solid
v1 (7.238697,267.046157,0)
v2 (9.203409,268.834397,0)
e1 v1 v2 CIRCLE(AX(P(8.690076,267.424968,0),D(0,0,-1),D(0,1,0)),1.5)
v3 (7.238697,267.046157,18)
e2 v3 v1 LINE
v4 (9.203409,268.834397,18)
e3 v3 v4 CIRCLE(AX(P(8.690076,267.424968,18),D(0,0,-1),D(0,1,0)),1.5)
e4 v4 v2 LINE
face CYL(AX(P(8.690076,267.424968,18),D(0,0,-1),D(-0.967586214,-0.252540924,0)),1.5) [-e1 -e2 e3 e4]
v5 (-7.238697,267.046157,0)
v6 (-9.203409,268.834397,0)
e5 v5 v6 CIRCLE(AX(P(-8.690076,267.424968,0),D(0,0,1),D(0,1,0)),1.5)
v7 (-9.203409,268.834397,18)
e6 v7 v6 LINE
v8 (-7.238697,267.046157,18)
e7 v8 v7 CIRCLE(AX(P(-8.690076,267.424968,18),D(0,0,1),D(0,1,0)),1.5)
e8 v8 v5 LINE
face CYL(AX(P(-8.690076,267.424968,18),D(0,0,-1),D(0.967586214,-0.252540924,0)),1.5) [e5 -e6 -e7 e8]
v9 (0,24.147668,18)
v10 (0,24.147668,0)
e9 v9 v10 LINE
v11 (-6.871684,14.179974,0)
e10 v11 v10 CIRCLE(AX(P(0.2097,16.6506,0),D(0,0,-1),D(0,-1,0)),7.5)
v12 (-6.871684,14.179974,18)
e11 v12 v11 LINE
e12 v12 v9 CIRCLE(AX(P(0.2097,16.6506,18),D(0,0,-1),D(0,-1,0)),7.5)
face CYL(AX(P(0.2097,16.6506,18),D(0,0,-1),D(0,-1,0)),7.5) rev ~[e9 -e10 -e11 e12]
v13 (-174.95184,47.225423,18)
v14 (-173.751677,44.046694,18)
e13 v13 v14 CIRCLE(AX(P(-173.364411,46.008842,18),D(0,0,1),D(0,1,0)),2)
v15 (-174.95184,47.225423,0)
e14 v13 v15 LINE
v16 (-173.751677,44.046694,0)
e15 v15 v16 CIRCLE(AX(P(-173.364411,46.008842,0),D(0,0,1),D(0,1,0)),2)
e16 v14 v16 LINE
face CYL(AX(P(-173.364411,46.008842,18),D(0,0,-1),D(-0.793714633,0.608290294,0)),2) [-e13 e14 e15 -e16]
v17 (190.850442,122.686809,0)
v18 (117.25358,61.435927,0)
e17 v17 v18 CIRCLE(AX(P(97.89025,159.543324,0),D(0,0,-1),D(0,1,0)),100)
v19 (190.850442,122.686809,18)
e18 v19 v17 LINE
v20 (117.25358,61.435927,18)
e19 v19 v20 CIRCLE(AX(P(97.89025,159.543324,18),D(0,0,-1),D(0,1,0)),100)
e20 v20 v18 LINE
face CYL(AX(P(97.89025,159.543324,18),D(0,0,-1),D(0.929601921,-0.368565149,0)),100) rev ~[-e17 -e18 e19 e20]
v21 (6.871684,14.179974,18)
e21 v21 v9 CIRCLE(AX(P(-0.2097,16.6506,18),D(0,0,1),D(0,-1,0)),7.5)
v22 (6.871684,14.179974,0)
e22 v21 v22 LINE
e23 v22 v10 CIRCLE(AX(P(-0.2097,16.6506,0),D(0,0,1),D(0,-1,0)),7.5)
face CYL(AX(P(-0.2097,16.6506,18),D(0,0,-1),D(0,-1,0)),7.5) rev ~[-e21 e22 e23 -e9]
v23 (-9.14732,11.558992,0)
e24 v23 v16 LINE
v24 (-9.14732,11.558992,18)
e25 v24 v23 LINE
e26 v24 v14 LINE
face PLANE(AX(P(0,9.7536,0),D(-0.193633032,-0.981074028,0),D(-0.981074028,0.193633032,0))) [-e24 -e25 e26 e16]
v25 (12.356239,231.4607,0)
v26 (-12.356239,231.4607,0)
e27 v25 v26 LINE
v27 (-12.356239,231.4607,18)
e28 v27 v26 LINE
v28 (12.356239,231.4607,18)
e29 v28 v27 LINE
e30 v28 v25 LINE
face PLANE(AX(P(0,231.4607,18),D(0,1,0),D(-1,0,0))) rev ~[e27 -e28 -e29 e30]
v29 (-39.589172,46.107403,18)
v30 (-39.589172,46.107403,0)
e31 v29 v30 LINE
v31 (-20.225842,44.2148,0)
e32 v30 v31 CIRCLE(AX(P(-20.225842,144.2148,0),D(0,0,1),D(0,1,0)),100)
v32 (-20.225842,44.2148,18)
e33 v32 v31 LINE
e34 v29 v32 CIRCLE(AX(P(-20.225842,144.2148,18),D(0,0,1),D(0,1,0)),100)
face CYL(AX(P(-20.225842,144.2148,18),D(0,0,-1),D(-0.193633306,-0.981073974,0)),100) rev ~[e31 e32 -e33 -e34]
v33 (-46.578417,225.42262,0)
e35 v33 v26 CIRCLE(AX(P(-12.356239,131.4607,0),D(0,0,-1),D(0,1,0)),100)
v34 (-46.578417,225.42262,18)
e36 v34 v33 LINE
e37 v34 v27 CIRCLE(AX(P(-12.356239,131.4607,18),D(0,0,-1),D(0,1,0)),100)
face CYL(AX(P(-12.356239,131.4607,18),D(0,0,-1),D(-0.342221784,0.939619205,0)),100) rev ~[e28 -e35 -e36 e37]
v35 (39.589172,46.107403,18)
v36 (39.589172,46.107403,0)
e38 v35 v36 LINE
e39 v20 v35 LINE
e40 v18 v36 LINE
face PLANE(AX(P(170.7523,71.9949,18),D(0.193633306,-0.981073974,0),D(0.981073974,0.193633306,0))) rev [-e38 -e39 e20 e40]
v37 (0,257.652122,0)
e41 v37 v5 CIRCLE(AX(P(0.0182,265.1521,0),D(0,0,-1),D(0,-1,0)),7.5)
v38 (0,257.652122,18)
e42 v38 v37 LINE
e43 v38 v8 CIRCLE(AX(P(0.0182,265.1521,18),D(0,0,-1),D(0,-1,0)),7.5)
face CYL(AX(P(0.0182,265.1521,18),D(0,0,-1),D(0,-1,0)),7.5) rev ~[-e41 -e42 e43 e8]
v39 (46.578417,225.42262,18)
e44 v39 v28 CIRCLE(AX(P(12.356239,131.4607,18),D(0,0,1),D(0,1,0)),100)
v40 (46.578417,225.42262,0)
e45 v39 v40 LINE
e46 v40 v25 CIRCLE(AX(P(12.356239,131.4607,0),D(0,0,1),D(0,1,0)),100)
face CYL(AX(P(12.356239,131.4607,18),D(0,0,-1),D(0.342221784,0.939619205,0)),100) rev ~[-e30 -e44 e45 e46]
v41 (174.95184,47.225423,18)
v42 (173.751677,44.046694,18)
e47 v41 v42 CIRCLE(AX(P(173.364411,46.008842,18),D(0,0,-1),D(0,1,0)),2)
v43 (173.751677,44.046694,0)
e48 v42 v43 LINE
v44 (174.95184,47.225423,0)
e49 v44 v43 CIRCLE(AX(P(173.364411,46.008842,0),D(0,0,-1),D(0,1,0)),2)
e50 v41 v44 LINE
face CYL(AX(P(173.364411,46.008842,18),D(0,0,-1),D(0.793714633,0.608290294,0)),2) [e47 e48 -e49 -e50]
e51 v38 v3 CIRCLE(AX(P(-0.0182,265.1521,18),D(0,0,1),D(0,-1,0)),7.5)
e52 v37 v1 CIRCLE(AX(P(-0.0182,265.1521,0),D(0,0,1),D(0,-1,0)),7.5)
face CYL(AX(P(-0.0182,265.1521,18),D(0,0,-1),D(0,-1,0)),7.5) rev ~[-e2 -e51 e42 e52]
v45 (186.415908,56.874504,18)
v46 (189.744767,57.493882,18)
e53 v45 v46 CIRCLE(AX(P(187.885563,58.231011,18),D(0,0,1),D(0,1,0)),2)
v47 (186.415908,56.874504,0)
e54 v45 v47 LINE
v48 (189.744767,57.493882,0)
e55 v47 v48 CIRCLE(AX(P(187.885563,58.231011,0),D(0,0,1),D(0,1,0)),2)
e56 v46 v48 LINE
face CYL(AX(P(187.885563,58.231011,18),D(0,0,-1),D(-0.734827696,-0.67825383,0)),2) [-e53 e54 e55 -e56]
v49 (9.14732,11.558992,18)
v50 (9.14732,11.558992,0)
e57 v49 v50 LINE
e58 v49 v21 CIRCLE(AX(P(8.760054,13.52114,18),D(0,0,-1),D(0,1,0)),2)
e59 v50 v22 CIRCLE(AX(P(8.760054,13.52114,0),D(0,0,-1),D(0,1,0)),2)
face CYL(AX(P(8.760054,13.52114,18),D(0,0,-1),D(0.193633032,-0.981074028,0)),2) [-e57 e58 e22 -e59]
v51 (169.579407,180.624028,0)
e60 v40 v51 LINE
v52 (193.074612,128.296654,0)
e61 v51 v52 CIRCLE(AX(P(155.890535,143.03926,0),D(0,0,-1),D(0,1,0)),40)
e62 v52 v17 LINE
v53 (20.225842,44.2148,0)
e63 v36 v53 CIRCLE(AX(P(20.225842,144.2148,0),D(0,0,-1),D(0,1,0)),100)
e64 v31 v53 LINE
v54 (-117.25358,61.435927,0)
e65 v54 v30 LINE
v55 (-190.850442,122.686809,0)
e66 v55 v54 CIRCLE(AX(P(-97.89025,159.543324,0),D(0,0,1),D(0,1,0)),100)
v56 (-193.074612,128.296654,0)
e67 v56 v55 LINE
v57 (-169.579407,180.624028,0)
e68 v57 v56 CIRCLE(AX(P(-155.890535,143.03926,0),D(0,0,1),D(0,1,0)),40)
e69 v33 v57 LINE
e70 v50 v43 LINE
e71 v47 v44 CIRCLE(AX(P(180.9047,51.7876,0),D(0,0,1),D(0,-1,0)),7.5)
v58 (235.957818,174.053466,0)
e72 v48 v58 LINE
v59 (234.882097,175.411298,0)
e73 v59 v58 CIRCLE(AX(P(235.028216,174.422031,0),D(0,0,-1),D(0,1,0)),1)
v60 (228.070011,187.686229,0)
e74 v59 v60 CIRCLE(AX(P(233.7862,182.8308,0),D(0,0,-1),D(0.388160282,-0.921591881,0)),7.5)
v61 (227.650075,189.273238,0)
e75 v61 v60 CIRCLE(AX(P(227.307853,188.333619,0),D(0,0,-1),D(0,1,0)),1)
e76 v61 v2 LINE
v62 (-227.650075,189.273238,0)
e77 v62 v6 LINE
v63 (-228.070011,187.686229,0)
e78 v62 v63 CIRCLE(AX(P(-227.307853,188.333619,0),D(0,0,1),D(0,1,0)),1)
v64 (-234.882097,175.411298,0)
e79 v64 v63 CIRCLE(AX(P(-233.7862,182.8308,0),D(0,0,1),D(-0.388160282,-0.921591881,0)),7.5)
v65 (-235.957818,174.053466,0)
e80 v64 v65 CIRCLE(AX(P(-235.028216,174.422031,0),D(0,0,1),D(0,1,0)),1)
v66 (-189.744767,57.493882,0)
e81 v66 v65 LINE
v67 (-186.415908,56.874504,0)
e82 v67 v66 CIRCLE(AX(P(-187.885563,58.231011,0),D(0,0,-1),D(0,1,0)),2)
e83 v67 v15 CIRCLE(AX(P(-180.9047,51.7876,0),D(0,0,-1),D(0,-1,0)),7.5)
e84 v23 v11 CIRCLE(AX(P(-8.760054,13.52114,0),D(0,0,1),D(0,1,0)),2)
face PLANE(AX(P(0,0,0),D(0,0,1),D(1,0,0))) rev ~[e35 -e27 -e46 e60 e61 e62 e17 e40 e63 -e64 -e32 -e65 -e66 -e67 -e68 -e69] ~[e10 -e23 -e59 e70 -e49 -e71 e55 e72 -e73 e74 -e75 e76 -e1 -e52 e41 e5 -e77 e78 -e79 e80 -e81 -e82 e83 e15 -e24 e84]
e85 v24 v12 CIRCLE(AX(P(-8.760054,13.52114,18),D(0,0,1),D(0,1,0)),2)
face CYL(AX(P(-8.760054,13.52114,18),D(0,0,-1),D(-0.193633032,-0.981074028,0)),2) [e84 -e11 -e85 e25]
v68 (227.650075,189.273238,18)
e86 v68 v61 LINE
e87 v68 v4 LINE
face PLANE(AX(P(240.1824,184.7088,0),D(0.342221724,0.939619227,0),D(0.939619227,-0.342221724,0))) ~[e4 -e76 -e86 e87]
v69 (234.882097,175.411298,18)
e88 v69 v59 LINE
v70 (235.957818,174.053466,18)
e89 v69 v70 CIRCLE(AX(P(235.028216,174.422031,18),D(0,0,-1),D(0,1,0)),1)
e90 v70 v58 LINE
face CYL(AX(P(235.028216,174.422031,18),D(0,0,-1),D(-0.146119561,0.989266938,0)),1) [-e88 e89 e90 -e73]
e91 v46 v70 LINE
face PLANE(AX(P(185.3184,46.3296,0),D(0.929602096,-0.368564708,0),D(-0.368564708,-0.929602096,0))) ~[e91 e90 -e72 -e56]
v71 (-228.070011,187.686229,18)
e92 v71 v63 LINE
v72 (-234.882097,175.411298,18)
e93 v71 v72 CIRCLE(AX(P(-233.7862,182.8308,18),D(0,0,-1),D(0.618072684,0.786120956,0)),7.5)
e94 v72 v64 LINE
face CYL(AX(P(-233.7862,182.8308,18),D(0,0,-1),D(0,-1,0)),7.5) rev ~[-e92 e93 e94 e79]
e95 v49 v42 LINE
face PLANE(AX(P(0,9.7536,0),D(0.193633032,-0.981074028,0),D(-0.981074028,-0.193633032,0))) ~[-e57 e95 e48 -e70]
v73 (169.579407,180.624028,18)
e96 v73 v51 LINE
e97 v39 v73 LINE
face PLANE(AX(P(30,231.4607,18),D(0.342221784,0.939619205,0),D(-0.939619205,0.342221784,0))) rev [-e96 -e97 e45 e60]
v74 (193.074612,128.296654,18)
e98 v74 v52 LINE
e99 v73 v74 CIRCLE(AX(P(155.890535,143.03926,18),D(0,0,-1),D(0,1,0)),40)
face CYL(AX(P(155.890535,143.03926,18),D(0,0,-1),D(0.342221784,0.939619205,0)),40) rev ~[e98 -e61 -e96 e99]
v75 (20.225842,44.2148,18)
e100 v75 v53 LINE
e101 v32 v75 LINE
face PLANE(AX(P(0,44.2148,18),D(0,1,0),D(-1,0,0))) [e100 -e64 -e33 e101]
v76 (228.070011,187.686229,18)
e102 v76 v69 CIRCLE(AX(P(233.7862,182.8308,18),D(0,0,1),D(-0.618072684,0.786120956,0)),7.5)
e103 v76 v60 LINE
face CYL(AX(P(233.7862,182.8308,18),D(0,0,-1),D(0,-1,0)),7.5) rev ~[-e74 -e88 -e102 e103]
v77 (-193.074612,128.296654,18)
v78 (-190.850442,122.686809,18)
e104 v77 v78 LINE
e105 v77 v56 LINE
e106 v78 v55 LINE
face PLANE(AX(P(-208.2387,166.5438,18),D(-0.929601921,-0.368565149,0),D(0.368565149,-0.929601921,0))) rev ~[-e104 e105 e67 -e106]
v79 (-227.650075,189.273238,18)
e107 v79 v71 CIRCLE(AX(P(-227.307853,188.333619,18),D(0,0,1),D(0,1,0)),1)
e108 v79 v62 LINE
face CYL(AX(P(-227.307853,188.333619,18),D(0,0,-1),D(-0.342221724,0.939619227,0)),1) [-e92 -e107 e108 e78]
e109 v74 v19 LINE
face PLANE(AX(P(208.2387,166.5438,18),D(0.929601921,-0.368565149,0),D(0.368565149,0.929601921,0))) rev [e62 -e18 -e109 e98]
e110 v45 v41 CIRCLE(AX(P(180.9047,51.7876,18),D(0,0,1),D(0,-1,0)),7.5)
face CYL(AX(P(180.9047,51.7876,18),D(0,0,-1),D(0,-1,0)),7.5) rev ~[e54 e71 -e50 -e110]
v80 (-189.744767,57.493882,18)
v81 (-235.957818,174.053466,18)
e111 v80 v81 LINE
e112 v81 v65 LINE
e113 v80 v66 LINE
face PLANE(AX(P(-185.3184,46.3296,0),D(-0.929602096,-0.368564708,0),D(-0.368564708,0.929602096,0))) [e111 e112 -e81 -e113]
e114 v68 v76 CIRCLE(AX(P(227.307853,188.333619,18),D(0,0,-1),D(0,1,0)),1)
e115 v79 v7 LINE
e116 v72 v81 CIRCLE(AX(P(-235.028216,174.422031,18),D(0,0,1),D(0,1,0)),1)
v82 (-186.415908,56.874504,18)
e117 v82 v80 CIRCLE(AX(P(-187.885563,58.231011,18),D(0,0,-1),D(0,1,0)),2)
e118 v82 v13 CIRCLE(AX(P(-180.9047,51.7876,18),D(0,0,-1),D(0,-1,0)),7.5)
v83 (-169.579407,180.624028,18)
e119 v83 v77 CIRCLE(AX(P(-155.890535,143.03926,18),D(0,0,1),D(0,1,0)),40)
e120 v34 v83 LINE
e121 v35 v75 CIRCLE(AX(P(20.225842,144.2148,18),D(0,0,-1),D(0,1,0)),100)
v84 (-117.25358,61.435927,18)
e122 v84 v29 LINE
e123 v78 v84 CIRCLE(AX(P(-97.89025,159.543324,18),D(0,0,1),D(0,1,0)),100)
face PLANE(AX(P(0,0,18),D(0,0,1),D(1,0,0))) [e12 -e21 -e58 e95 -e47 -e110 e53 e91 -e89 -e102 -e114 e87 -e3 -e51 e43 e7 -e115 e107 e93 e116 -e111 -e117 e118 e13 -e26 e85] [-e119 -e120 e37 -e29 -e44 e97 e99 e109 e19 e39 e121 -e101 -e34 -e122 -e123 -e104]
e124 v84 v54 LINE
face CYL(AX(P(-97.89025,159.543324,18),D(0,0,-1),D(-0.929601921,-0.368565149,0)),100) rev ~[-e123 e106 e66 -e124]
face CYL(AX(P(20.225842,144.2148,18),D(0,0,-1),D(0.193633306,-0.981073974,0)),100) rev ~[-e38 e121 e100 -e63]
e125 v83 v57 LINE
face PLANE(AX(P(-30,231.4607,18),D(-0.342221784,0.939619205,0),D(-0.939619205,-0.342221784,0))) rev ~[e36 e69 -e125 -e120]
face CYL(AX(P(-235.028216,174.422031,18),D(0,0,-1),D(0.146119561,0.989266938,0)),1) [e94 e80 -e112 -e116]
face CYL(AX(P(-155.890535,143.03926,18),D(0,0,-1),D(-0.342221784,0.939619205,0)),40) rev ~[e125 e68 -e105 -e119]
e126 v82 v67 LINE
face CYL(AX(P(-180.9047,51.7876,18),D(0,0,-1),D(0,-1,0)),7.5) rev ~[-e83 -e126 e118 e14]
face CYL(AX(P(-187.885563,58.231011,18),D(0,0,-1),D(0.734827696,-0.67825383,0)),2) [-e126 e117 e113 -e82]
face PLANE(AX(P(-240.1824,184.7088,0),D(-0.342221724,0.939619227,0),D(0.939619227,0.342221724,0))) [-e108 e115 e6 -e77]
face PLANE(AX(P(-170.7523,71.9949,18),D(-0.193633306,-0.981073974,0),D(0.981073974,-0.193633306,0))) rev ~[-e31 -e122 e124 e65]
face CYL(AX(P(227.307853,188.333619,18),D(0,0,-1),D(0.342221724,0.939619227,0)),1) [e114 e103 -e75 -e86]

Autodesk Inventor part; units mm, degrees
ref_plane "YZ Plane" through (0, 0, 0) normal (1, 0, 0) x (0, 1, 0)
ref_plane "XZ Plane" through (0, 0, 0) normal (0, 1, 0) x (-1, 0, 0)
ref_plane "XY Plane" through (0, 0, 0) normal (0, 0, 1) x (1, 0, 0)
sketch "Sketch1" plane through (0, 0, 0) normal (0, 0, 1) x (1, 0, 0)
  line L0 (0, 9.7536) -> (-185.3184, 46.3296)
  line L1 (-185.3184, 46.3296) -> (-240.1824, 184.7088)
  line L2 (-240.1824, 184.7088) -> (0, 272.1864)
  line L3 (0, 562.8605) -> (0, -145.2705) construction
  line L4 (0, 272.1864) -> (0, 9.7536)
  point P0 (0, 0)
  dimension "d9" = 272.1864
  dimension "d11" = 240.1824
  dimension "d15" = 184.7088
  dimension "d20" = 185.3184
  dimension "d22" = 46.3296
  dimension "d39" = 0
  dimension "d41" = 0
  dimension "d42" = 9.7536
extrude "Extrusion4" add sketch "Sketch1" along normal blind 18
hole "Hole2" at (0.0182, 265.1521, 18) direction (0, 0, -1) diameter 15 end through all
hole "Hole3" at (-233.7862, 182.8308, 18) direction (0, 0, -1) diameter 15 end through all
hole "Hole4" at (-180.9047, 51.7876, 18) direction (0, 0, -1) diameter 15 end through all
hole "Hole5" at (0.2097, 16.6506, 18) direction (0, 0, -1) diameter 15 end through all
sketch "Sketch6" plane through (0, 0, 18) normal (0, 0, 1) x (1, 0, 0)
  line L0 (-30, 231.4607) -> (-208.2387, 166.5438)
  line L1 (-208.2387, 166.5438) -> (-170.7523, 71.9949)
  line L2 (-170.7523, 71.9949) -> (-30, 44.2148)
  line L3 (-5.5654, 270.1594) -> (-229.1506, 188.7267) projected
  line L4 (-236.6974, 175.9189) -> (-188.1895, 53.5712) projected
  line L5 (-177.9802, 44.8813) -> (-4.1975, 10.582) projected
  line L6 (0, 231.4607) -> (-30, 231.4607)
  line L7 (0, 44.2148) -> (-30, 44.2148)
  line L8 (0, 44.2148) -> (0, 231.4607)
  point P0 (0, 0)
  dimension "d167" = 23
  dimension "d168" = 28
  dimension "d170" = 28
  dimension "d171" = 30
  dimension "d173" = 0
  dimension "d174" = 30
extrude "Extrusion6" cut sketch "Sketch6" against normal through all
fillet "Fillet6" radius 40 1 edges at (-208.2387, 166.5438, 9)
fillet "Fillet7" radius 100 1 edges at (-170.7523, 71.9949, 9)
fillet "Fillet8" radius 100 1 edges at (-30, 44.2148, 9)
fillet "Fillet9" radius 100 1 edges at (-30, 231.4607, 9)
fillet "Fillet10" radius 1.5 1 edges at (-5.5654, 270.1594, 9)
fillet "Fillet11" radius 1 1 edges at (-229.1506, 188.7267, 9)
fillet "Fillet12" radius 1 1 edges at (-236.6974, 175.9189, 9)
fillet "Fillet13" radius 2 1 edges at (-177.9802, 44.8813, 9)
fillet "Fillet14" radius 2 1 edges at (-188.1895, 53.5712, 9)
fillet "Fillet15" radius 2 1 edges at (-4.1975, 10.582, 9)
mirror "Mirror3" about plane through (0, 0, 0) normal (1, 0, 0)
properties part number "section1" material "Polyethylene, High Density"
